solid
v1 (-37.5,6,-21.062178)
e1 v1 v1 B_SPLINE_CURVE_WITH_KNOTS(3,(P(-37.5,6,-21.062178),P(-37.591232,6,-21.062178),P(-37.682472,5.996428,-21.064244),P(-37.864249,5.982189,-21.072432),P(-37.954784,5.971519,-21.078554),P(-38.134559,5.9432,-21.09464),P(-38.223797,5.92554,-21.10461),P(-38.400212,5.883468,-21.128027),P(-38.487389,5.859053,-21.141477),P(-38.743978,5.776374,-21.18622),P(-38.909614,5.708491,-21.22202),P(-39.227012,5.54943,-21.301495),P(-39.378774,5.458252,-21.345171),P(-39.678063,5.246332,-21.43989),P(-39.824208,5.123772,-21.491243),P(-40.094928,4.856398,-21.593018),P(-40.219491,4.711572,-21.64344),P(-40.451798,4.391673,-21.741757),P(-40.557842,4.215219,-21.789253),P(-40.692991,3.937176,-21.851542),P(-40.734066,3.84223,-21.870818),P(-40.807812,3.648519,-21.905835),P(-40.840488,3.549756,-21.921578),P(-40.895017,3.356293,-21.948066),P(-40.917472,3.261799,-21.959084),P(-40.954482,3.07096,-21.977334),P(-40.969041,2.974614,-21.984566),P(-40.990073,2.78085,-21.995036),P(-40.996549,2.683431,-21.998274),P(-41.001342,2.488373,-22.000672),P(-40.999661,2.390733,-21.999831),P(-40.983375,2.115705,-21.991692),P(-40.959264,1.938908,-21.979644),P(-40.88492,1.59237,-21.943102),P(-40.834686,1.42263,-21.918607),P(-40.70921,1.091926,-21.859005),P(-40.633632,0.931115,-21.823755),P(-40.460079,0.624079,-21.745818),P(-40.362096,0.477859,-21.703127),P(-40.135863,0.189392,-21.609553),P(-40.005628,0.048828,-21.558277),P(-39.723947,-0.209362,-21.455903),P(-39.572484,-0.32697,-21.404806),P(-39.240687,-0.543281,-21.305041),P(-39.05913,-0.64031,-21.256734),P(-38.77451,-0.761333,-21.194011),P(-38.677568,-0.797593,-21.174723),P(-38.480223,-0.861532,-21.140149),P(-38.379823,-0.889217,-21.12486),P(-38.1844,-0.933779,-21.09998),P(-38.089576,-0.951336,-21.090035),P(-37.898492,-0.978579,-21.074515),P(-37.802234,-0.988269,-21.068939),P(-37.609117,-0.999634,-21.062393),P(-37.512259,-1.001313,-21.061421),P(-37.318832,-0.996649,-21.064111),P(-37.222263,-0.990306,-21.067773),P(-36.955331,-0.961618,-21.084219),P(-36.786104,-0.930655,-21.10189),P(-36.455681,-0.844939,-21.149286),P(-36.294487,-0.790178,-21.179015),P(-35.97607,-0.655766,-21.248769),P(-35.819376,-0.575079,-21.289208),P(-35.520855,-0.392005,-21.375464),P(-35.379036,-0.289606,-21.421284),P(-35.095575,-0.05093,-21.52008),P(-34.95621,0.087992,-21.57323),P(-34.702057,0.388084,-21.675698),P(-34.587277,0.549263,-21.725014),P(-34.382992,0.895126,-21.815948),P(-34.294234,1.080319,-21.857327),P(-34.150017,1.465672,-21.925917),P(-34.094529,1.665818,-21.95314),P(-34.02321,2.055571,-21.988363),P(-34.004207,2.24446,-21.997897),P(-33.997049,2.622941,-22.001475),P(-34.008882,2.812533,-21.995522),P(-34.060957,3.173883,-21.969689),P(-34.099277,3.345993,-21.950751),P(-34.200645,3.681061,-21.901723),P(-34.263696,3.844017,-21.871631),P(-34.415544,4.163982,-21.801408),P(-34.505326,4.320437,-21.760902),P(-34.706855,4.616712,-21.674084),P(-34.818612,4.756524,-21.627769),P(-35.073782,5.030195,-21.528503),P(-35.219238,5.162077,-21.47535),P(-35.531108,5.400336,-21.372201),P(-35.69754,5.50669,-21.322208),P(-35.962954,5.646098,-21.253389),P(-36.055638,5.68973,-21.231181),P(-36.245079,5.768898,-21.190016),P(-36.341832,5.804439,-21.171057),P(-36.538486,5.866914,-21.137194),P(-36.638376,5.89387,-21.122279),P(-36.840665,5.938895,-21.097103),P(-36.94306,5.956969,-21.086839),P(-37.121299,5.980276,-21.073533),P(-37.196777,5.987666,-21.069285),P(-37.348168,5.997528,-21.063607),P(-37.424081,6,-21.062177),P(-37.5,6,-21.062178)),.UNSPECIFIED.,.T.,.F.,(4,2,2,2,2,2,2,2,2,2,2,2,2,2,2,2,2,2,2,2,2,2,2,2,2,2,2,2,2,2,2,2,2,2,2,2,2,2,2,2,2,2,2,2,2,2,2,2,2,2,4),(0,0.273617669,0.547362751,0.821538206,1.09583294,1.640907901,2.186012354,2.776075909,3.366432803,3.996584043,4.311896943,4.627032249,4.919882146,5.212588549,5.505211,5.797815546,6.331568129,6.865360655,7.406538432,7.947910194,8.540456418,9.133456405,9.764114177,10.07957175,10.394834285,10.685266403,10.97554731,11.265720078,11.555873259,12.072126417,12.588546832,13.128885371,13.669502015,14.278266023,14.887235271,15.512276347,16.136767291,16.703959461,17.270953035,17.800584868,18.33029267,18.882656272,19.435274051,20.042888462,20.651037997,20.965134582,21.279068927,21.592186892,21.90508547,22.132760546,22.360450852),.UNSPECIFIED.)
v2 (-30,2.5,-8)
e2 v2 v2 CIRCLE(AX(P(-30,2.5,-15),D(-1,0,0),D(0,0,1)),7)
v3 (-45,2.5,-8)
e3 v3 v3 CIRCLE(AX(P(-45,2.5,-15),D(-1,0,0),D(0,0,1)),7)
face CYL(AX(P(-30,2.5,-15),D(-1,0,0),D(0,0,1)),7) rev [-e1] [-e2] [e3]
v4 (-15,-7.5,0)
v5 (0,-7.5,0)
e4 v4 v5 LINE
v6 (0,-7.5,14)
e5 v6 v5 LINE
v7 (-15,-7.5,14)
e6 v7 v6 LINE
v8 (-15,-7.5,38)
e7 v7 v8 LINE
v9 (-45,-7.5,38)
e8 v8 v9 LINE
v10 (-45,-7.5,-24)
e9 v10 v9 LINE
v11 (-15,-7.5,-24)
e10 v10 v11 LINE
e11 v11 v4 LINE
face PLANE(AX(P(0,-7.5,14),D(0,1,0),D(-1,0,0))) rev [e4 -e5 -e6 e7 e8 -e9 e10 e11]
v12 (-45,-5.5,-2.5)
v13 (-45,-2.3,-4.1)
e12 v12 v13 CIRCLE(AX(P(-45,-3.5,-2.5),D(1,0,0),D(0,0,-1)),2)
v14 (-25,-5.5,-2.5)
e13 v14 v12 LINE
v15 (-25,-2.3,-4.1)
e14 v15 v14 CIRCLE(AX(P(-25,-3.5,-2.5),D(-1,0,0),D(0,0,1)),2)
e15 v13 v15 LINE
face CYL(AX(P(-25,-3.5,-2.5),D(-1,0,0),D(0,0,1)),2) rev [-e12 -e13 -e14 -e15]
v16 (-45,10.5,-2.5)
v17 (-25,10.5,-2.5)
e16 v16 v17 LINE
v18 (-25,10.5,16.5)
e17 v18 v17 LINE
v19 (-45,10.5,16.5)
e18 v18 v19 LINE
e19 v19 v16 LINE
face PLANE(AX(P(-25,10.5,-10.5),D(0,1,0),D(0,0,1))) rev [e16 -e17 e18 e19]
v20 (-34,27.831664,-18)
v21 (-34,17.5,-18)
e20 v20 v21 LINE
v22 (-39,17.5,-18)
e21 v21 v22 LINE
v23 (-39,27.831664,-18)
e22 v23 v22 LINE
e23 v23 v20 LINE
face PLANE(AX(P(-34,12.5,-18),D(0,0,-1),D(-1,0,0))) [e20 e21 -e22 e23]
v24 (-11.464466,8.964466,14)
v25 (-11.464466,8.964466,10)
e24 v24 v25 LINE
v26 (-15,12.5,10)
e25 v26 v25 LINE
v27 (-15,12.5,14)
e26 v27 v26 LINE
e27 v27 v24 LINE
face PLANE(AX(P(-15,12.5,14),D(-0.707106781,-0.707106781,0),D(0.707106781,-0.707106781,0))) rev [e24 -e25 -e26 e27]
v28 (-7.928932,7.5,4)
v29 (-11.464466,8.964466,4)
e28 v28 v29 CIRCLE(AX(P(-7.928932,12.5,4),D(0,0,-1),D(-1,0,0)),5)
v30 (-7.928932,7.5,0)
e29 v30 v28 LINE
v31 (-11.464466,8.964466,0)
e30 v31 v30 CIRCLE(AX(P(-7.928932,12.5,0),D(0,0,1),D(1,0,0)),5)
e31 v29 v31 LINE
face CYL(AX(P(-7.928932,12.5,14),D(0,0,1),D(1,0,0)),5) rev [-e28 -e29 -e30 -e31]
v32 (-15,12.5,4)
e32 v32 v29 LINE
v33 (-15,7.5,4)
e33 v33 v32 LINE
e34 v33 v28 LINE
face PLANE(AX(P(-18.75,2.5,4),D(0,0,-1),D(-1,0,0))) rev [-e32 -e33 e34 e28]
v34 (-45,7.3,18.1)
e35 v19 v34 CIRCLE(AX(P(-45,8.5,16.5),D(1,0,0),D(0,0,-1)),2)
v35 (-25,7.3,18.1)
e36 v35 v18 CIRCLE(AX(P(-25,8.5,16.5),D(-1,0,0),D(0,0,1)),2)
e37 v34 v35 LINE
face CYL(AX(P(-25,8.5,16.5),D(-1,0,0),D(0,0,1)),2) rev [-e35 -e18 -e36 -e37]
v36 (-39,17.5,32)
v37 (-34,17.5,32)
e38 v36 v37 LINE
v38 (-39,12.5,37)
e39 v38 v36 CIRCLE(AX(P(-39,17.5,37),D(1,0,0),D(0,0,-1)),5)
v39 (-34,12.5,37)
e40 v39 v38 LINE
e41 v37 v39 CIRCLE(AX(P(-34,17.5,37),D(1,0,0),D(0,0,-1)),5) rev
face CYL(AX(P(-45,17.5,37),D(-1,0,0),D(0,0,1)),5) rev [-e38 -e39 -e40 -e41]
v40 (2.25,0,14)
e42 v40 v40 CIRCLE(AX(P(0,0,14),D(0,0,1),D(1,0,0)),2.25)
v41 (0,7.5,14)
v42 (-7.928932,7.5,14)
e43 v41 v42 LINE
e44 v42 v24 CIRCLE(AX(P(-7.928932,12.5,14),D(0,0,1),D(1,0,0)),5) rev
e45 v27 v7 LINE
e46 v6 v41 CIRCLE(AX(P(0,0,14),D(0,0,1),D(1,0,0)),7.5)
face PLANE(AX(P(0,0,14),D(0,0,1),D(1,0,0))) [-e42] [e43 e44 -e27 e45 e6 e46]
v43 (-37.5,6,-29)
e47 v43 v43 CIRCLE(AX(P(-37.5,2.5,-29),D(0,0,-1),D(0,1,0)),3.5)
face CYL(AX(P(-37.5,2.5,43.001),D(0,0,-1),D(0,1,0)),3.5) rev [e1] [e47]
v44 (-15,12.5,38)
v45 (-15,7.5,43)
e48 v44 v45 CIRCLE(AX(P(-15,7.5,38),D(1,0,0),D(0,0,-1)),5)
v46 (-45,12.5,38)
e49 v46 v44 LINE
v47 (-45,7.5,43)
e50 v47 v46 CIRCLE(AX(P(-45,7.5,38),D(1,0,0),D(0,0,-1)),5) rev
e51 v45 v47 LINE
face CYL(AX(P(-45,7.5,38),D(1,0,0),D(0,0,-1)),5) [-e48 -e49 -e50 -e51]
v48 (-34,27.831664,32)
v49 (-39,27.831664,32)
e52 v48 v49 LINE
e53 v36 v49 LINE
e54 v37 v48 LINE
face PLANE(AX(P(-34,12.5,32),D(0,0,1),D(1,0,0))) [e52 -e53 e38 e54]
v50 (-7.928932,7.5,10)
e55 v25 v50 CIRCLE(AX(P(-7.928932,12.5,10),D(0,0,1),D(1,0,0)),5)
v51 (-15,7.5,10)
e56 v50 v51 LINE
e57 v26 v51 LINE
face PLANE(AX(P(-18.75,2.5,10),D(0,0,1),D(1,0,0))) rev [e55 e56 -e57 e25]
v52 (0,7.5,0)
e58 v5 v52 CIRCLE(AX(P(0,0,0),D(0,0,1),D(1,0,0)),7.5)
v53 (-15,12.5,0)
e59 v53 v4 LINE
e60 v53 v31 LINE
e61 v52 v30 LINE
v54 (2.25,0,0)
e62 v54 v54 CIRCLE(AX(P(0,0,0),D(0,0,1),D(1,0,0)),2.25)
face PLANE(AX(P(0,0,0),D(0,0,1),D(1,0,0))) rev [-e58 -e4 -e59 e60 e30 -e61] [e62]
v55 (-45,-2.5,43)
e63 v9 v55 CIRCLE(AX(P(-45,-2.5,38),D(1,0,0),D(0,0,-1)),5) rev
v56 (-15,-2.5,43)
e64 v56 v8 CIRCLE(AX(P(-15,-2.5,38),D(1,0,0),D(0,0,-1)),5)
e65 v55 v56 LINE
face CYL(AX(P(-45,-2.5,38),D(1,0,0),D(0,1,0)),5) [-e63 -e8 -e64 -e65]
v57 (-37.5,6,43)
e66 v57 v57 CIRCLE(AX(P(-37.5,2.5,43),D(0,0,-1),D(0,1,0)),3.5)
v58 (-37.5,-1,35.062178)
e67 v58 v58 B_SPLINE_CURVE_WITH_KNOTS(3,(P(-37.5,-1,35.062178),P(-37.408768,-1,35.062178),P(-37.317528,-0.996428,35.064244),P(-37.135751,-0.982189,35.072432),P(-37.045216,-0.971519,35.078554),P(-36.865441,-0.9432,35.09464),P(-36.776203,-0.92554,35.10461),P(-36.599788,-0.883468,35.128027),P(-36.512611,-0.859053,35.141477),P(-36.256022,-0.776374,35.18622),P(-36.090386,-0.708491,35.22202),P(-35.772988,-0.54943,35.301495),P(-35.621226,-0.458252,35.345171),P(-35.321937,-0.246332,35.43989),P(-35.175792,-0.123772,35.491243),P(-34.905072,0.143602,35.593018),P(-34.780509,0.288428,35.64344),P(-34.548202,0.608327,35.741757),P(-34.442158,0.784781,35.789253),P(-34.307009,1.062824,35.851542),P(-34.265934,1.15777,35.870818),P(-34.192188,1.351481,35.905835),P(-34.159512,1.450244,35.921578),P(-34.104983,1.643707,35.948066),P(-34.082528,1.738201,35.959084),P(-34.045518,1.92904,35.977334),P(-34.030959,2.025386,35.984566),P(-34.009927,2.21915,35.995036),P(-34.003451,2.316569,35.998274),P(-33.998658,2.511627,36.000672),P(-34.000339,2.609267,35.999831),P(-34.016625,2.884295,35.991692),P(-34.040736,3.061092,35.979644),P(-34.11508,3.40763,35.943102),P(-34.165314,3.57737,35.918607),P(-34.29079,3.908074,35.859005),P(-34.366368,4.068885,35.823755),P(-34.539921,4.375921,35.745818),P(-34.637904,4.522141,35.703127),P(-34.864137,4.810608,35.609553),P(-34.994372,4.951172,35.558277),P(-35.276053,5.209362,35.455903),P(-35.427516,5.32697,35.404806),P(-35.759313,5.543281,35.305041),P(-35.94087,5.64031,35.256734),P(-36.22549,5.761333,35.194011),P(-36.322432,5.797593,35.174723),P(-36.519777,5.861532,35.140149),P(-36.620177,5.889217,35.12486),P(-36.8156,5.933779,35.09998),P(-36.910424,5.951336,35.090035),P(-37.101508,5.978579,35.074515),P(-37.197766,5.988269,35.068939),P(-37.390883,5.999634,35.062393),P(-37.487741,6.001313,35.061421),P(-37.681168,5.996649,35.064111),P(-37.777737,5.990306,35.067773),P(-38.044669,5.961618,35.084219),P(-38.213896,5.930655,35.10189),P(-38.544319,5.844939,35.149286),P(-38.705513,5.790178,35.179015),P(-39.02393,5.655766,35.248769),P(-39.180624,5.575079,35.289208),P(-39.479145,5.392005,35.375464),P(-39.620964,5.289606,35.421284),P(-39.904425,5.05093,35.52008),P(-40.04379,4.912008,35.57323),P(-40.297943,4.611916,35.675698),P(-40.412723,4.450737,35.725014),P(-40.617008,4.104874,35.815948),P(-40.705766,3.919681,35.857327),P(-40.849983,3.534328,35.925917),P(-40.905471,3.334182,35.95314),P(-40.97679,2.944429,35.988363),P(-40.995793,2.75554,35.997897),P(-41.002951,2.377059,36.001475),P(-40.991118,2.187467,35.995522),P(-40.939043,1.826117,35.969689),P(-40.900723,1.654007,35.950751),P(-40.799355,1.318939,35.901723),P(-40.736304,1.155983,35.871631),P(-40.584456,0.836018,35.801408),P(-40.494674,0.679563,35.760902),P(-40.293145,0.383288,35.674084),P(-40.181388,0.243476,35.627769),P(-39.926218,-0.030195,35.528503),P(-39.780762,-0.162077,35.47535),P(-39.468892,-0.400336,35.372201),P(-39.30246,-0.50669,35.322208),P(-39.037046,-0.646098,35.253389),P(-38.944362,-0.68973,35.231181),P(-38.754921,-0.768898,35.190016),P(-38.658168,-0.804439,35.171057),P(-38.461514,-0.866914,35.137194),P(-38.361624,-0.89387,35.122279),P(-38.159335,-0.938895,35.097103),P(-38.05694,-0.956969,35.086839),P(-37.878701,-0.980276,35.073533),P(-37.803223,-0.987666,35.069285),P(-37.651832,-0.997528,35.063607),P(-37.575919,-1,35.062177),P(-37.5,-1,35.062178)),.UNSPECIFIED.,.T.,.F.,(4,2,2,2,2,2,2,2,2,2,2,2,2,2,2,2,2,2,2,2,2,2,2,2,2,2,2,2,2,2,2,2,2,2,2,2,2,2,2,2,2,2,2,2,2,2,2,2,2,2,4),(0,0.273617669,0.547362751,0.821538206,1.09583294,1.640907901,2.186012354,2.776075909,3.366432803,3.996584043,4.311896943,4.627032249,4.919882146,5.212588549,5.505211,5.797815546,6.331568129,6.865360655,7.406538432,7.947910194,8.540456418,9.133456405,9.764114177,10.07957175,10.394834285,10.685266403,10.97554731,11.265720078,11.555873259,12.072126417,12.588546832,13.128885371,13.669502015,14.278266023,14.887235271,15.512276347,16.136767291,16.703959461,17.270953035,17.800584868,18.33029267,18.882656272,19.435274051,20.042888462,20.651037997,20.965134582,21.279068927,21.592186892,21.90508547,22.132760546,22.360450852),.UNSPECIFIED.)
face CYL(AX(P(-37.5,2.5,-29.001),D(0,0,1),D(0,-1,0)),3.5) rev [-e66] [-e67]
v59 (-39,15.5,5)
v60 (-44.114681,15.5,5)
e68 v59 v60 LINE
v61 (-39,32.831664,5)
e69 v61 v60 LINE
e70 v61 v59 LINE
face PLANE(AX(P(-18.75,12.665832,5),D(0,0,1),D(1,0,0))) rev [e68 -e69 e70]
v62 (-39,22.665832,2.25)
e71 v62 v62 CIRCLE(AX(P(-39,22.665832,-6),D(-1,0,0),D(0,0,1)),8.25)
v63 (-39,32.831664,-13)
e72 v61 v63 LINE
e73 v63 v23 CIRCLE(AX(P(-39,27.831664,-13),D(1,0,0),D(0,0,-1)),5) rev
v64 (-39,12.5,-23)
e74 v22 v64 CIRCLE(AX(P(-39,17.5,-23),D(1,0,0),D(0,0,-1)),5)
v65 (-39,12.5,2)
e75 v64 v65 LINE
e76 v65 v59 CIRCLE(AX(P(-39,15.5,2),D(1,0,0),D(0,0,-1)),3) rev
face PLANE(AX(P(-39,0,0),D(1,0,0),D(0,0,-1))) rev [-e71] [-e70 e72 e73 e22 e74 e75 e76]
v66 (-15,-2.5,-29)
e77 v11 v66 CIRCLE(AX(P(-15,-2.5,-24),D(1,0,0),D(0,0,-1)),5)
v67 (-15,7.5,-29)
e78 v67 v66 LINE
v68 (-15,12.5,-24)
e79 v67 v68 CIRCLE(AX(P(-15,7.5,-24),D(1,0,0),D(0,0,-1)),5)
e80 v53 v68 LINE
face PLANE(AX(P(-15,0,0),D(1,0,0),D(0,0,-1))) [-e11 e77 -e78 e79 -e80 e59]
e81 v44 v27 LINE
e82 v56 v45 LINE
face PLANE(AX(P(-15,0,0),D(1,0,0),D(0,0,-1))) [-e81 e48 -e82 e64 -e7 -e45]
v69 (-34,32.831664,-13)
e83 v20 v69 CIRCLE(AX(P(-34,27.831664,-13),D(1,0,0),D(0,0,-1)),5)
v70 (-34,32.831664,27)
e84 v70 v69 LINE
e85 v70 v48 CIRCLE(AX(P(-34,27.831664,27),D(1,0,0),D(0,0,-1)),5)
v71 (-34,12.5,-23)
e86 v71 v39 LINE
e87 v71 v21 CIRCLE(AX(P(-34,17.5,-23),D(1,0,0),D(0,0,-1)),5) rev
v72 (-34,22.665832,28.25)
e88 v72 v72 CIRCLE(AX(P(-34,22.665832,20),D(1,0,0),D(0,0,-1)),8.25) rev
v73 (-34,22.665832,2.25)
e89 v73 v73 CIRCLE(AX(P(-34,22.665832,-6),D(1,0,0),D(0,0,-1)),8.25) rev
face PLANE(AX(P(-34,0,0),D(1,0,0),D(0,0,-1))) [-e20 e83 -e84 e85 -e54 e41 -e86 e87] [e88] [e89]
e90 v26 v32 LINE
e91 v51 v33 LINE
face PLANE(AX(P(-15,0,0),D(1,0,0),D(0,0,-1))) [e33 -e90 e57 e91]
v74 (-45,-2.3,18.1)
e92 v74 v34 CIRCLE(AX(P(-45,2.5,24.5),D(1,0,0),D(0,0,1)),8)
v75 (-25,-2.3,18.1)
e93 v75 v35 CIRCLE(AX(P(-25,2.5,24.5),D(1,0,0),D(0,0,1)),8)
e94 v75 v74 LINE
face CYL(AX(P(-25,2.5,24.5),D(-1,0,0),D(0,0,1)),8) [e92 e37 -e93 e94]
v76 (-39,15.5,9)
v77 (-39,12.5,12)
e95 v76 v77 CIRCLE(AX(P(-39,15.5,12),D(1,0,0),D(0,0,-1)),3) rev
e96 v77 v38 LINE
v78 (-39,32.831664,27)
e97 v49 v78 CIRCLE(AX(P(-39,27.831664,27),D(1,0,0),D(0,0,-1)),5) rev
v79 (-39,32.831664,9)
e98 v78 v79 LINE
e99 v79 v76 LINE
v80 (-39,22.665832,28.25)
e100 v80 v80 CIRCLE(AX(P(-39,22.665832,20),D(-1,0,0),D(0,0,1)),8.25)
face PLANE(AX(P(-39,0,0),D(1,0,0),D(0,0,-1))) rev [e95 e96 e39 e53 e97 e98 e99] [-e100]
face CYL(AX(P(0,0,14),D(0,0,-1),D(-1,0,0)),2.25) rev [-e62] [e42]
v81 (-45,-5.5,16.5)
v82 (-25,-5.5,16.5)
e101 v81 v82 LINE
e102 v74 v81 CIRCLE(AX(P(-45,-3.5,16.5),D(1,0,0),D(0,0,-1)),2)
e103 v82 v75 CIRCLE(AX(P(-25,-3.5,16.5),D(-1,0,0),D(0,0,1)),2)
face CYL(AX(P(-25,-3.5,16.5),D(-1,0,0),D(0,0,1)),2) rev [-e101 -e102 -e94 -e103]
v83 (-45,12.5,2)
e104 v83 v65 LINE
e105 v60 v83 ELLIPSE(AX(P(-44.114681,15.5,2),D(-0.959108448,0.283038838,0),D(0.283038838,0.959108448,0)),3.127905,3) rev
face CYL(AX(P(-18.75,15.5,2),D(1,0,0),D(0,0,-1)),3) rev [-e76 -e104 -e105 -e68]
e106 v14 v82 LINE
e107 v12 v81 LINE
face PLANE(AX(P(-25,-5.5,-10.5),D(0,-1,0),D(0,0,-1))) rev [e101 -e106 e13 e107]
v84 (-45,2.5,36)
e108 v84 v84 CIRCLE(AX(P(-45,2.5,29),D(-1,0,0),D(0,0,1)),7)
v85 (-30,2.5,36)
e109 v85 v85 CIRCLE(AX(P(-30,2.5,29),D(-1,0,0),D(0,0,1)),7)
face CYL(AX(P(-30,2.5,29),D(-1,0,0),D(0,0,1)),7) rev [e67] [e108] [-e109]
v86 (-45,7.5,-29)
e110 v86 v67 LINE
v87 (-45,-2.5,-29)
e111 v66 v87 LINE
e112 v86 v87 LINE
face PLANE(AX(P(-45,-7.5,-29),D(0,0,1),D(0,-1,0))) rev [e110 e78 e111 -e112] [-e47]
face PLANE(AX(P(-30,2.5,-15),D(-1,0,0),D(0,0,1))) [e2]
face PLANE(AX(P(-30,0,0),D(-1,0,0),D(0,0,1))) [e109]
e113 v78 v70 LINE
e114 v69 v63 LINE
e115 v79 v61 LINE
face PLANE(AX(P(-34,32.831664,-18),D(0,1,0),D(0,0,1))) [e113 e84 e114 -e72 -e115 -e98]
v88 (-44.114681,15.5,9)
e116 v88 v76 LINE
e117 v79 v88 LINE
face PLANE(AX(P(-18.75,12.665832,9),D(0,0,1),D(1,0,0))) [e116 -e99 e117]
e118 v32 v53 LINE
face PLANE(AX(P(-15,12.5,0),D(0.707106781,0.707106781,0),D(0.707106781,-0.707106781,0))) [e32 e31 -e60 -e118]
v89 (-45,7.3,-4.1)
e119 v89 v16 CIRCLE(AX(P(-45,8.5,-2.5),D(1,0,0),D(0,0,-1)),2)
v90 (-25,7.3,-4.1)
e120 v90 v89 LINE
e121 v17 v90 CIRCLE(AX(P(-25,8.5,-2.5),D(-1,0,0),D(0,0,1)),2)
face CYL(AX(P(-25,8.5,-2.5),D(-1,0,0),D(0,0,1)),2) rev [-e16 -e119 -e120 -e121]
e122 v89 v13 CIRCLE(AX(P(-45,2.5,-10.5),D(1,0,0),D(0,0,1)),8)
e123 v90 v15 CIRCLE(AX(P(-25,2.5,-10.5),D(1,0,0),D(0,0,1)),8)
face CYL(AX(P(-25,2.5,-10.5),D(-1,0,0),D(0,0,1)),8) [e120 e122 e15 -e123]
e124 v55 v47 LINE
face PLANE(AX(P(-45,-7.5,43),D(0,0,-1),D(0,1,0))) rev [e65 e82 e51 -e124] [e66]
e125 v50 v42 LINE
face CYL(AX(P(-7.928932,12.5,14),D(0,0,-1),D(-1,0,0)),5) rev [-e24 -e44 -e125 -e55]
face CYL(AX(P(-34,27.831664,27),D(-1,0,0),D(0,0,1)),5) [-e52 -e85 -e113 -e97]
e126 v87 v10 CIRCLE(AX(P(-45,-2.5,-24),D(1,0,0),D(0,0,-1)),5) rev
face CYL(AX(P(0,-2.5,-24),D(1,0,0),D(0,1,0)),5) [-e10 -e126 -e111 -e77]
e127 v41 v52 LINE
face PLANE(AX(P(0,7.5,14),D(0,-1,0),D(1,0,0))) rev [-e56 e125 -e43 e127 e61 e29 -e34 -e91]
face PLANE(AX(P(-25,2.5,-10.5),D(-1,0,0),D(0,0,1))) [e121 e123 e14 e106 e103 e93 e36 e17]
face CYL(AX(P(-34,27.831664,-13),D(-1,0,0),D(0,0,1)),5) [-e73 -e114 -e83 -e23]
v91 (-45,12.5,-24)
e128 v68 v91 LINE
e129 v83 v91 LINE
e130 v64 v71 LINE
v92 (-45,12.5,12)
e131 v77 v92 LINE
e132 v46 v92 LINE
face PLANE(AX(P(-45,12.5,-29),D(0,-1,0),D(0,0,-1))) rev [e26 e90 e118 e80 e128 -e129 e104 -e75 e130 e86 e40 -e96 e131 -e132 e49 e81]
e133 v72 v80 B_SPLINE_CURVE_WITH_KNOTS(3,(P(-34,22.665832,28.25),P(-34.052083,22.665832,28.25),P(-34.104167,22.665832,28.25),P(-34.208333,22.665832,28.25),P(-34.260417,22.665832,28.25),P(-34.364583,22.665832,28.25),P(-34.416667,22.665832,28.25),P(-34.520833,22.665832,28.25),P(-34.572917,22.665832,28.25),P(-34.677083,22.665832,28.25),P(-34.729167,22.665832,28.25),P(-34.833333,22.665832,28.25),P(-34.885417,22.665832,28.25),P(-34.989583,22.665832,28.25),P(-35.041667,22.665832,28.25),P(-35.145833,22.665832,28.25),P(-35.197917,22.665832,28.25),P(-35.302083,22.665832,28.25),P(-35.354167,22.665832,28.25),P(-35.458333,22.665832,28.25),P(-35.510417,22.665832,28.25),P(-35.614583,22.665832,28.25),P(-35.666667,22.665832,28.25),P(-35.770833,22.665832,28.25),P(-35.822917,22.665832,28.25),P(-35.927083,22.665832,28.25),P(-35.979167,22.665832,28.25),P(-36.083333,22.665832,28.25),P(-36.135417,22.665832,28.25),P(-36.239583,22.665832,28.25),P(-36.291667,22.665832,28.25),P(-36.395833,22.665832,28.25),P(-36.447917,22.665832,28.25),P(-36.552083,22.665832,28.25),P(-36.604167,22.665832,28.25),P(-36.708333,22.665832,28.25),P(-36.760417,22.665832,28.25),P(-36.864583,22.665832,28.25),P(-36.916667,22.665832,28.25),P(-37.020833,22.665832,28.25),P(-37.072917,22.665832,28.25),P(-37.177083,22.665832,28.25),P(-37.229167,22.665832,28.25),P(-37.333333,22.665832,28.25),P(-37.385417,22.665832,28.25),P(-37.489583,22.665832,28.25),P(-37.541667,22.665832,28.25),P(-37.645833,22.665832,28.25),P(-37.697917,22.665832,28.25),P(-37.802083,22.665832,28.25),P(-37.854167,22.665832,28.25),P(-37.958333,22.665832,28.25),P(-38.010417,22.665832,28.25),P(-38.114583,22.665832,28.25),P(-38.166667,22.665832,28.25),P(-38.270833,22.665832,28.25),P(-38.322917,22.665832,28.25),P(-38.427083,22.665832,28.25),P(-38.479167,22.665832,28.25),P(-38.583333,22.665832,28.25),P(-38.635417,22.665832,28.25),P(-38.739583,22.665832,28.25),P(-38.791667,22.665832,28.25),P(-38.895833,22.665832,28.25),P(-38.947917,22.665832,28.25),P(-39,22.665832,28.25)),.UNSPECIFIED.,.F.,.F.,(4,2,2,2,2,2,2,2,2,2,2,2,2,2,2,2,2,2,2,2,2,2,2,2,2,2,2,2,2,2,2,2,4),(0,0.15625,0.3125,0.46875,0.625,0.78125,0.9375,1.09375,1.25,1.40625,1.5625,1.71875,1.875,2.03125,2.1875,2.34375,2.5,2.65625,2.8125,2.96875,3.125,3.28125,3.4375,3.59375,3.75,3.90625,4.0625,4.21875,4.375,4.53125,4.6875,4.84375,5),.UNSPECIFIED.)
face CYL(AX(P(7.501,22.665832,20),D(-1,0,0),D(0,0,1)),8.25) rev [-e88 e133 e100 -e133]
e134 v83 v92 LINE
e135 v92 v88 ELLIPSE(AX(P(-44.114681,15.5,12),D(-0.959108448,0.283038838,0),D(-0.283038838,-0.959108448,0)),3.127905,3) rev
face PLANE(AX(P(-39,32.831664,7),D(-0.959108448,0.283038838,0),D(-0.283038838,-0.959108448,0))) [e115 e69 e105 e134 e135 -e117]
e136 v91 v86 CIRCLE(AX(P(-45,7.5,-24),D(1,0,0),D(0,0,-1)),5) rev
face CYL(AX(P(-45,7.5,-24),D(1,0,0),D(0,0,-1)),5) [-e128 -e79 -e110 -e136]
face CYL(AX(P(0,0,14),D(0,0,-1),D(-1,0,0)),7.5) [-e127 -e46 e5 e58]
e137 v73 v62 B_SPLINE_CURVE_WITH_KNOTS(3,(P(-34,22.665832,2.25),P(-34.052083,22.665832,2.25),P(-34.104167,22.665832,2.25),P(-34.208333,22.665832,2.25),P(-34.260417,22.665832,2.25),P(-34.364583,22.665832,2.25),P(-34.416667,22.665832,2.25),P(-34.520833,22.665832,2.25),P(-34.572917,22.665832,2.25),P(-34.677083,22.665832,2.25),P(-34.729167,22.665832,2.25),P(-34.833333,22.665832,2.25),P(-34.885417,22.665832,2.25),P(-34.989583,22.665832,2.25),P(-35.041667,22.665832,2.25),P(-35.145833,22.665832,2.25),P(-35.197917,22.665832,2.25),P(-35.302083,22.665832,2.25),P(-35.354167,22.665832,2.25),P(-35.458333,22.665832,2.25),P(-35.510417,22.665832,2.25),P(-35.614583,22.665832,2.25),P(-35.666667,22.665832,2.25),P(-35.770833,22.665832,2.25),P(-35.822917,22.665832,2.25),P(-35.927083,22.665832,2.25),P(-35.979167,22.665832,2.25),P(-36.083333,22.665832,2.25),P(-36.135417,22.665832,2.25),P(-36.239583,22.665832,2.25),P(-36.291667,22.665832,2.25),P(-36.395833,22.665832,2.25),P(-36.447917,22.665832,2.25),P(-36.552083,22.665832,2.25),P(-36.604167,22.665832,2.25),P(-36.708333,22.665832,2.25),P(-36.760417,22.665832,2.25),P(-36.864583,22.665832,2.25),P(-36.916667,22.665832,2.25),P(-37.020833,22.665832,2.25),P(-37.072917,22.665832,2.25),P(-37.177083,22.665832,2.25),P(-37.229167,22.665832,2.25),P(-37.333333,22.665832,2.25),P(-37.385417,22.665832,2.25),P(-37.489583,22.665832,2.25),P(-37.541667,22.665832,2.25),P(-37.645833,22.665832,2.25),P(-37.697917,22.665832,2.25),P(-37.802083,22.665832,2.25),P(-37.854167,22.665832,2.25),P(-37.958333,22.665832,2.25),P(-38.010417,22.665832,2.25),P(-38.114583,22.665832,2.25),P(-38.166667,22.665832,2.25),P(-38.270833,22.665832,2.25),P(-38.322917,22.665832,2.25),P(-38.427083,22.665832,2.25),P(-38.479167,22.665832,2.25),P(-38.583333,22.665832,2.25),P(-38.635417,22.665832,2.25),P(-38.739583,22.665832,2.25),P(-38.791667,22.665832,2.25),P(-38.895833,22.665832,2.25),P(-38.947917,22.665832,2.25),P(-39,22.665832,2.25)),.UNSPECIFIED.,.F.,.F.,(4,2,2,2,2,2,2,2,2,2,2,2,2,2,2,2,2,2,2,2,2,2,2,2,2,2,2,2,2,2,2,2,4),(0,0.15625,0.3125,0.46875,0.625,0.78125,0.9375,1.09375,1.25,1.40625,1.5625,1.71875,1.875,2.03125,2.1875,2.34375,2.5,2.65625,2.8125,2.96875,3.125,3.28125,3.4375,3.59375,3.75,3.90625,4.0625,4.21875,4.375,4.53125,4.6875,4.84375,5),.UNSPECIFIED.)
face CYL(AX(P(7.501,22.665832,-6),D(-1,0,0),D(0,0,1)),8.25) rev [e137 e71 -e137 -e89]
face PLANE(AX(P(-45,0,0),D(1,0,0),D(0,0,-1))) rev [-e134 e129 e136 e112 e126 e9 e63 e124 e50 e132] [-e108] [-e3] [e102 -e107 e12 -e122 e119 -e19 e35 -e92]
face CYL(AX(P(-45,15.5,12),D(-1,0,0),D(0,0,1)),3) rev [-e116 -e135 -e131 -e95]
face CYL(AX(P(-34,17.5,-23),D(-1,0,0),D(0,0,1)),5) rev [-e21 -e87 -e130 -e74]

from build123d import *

# Parameters (mm, degrees)
SKETCH1_R               = 2.2500000000000004
BOSS_EXTRUDE1_DEPTH     = 14
BOSS_EXTRUDE2_DEPTH     = 30
SKETCH3_R               = 7
CUT_EXTRUDE1_DEPTH      = 15
FILLET1_R               = 5
RIB1_REACH              = 65.484
SKETCH4_WALL_W          = 136.0395678423848
SKETCH4_WALL_H          = 4
FILLET2_R               = 5
BOSS_EXTRUDE3_START     = -6
SKETCH6_W               = 50
SKETCH6_H               = 20.33166445293904
BOSS_EXTRUDE3_DEPTH     = 5
CUT_EXTRUDE2_REACH      = 73.338
SKETCH7_R               = 8.250000000000005
SKETCH7_R_2             = 8.25
FILLET3_R               = 5
FILLET4_R               = 5
RIB2_REACH              = 68.324
SKETCH8_WALL_W          = 155.84718590256796
SKETCH8_WALL_H          = 4
FILLET5_R               = 3
CUT_EXTRUDE3_DEPTH      = 20
FILLET6_R               = 2
CUT_EXTRUDE4_REACH      = 93.033
CUT_EXTRUDE4_END_RADIUS = 7
SKETCH10_R              = 3.5000000000000004


with BuildPart() as part:
    # Sketch1 → Boss-Extrude1 (new body)
    with BuildSketch(Plane.XY):
        with BuildLine():
            Line((9.2e-16, 7.5), (-14.999999999999998, 7.500000000000002))
            Line((-14.999999999999998, 7.500000000000002), (-14.999999999999998, -7.500000000000002))
            Line((-14.999999999999998, -7.500000000000002), (9.2e-16, -7.5))
            ThreePointArc((9.2e-16, -7.5), (7.5, 0), (9.2e-16, 7.5))
        make_face()
        Circle(SKETCH1_R, mode=Mode.SUBTRACT)
    extrude(amount=BOSS_EXTRUDE1_DEPTH)

    # Sketch2 → Boss-Extrude2 (add)
    with BuildSketch(Plane.ZY.offset(14.999999999999998)):
        Polygon((-28.999999999999993, -7.500000000000002), (43, -7.500000000000002), (42.99999999999999, 12.499999999999998), (-28.99999999999999, 12.499999999999998), align=None)
    extrude(amount=BOSS_EXTRUDE2_DEPTH)

    # Sketch3 → Cut-Extrude1 (cut)
    with BuildSketch(Plane.ZY.offset(45)):
        with Locations((28.999999999999996, 2.499999999999998)):
            Circle(SKETCH3_R)
        with Locations((-15, 2.499999999999998)):
            Circle(SKETCH3_R)
    extrude(amount=-CUT_EXTRUDE1_DEPTH, mode=Mode.SUBTRACT)

    # Fillet1
    fillet1_edges = [part.edges().sort_by_distance(p)[0] for p in [
        (-30, 12.499999999999998, -28.99999999999999),
        (-30, -7.500000000000002, -28.999999999999993),
        (-30, -7.500000000000002, 43),
        (-30, 12.499999999999998, 42.99999999999999),
    ]]
    fillet(fillet1_edges, radius=FILLET1_R)

    # Sketch4 wall → Rib1 (add, up to next)
    with BuildSketch(Plane(origin=(-12.5, 10, 14), x_dir=(0.707106781187, -0.707106781187, 0), z_dir=(0.707106781187, 0.707106781187, 0)), mode=Mode.PRIVATE) as rib1_sk1:
        with Locations((0, 2)):
            Rectangle(SKETCH4_WALL_W, SKETCH4_WALL_H)
    rib1_tool1 = extrude(rib1_sk1.sketch, amount=-RIB1_REACH, mode=Mode.PRIVATE) - part.part
    rib1 = rib1_tool1.solids().sort_by_distance((-12.5, 10, 14))[0]
    add(rib1)

    # Mirror1: Rib1 across plane
    add(rib1.mirror(Plane.XY.offset(7)))

    # Fillet2
    fillet2_edges = [part.edges().sort_by_distance(p)[0] for p in [
        (-10.000000000000002, 7.500000000000001, 2),
        (-10.000000000000002, 7.500000000000001, 12),
    ]]
    fillet(fillet2_edges, radius=FILLET2_R)

    # Sketch6 → Boss-Extrude3 (add)
    with BuildSketch(Plane.ZY.offset(45).offset(BOSS_EXTRUDE3_START)):
        with Locations((7.000000000000005, 22.665832226469526)):
            Rectangle(SKETCH6_W, SKETCH6_H)
    extrude(amount=-BOSS_EXTRUDE3_DEPTH)

    # Sketch7 → Cut-Extrude2 (cut, up to next)
    with BuildSketch(Plane.ZY.offset(39), mode=Mode.PRIVATE) as cut_extrude2_sk1:
        with Locations((-5.999999999999993, 22.665832226469526)):
            Circle(SKETCH7_R)
    cut_extrude2_tool1 = extrude(cut_extrude2_sk1.sketch, amount=-CUT_EXTRUDE2_REACH, mode=Mode.PRIVATE) & part.part
    # Sketch7 → Cut-Extrude2 (cut, up to next)
    with BuildSketch(Plane.ZY.offset(39), mode=Mode.PRIVATE) as cut_extrude2_sk2:
        with Locations((20.000000000000007, 22.665832226469526)):
            Circle(SKETCH7_R_2)
    cut_extrude2_tool2 = extrude(cut_extrude2_sk2.sketch, amount=-CUT_EXTRUDE2_REACH, mode=Mode.PRIVATE) & part.part
    add(cut_extrude2_tool1.solids().sort_by_distance((-39, 22.665832, -6))[0], mode=Mode.SUBTRACT)
    add(cut_extrude2_tool2.solids().sort_by_distance((-39, 22.665832, 20))[0], mode=Mode.SUBTRACT)

    # Fillet3
    fillet3_edges = [part.edges().sort_by_distance(p)[0] for p in [
        (-36.5, 12.500000000000004, -17.999999999999996),
        (-36.5, 12.500000000000004, 32.00000000000001),
    ]]
    fillet(fillet3_edges, radius=FILLET3_R)

    # Fillet4
    fillet4_edges = [part.edges().sort_by_distance(p)[0] for p in [
        (-36.5, 32.831664452939044, -17.999999999999996),
        (-36.5, 32.831664452939044, 32.00000000000001),
    ]]
    fillet(fillet4_edges, radius=FILLET4_R)

    # Sketch8 wall → Rib2 (add, up to next)
    with BuildSketch(Plane(origin=(-42, 22.665832227, 7), x_dir=(-0.283038838463, -0.959108448467, 0), z_dir=(0.959108448467, -0.283038838463, 0)), mode=Mode.PRIVATE) as rib2_sk1:
        Rectangle(SKETCH8_WALL_W, SKETCH8_WALL_H)
    rib2_tool1 = extrude(rib2_sk1.sketch, amount=RIB2_REACH, mode=Mode.PRIVATE) - part.part
    add(rib2_tool1.solids().sort_by_distance((-42, 22.665832227, 7))[0])

    # Fillet5
    fillet5_edges = [part.edges().sort_by_distance(p)[0] for p in [
        (-42, 12.5, 9),
        (-42, 12.5, 5),
    ]]
    fillet(fillet5_edges, radius=FILLET5_R)

    # Sketch9 → Cut-Extrude3 (cut)
    with BuildSketch(Plane.ZY.offset(45)):
        with BuildLine():
            Line((-10.499999999999998, 10.499999999999998), (24.500000000000004, 10.499999999999998))
            ThreePointArc((24.500000000000004, 10.499999999999998), (16.500000000000004, 2.4999999999999996), (24.500000000000004, -5.500000000000002))
            Line((24.500000000000004, -5.500000000000002), (-10.499999999999998, -5.500000000000002))
            ThreePointArc((-10.499999999999998, -5.500000000000002), (-2.4999999999999982, 2.4999999999999987), (-10.499999999999998, 10.499999999999998))
        make_face()
    extrude(amount=-CUT_EXTRUDE3_DEPTH, mode=Mode.SUBTRACT)

    # Fillet6
    fillet6_edges = [part.edges().sort_by_distance(p)[0] for p in [
        (-35, -5.500000000000002, -10.499999999999998),
        (-35, 10.5, -10.499999999999996),
        (-35, 10.499999999999998, 24.500000000000004),
        (-35, -5.500000000000002, 24.500000000000004),
    ]]
    fillet(fillet6_edges, radius=FILLET6_R - 0.0001)  # a hair under: the kernel refuses the full size

    # Cut-Extrude4: up to this cylinder (the profile starts outside it)
    cut_extrude4_end = Plane(origin=(-37.5, 2.499999999999998, -15), z_dir=(-1, 0, 0)) * Cylinder(CUT_EXTRUDE4_END_RADIUS, 201.066, mode=Mode.PRIVATE)
    # Sketch10 → Cut-Extrude4 (cut, up to the surface)
    with BuildSketch(Plane(origin=(0, 5.03e-15, -28.999999999999993), x_dir=(-1, 0, 0), z_dir=(0, 1.7e-16, -1)), mode=Mode.PRIVATE) as cut_extrude4_sk1:
        with Locations(Location((37.5, 2.499999999999993, 0), (0, 0, 90))):
            Circle(SKETCH10_R)
    cut_extrude4_tool1 = extrude(cut_extrude4_sk1.sketch, amount=-CUT_EXTRUDE4_REACH, mode=Mode.PRIVATE) - cut_extrude4_end
    cut_extrude4 = cut_extrude4_tool1.solids().sort_by_distance((-37.5, 2.5, -29))[0]
    add(cut_extrude4, mode=Mode.SUBTRACT)

    # Mirror2: Cut-Extrude4 across plane
    add(cut_extrude4.mirror(Plane.XY.offset(7)), mode=Mode.SUBTRACT)


solid = part.part
